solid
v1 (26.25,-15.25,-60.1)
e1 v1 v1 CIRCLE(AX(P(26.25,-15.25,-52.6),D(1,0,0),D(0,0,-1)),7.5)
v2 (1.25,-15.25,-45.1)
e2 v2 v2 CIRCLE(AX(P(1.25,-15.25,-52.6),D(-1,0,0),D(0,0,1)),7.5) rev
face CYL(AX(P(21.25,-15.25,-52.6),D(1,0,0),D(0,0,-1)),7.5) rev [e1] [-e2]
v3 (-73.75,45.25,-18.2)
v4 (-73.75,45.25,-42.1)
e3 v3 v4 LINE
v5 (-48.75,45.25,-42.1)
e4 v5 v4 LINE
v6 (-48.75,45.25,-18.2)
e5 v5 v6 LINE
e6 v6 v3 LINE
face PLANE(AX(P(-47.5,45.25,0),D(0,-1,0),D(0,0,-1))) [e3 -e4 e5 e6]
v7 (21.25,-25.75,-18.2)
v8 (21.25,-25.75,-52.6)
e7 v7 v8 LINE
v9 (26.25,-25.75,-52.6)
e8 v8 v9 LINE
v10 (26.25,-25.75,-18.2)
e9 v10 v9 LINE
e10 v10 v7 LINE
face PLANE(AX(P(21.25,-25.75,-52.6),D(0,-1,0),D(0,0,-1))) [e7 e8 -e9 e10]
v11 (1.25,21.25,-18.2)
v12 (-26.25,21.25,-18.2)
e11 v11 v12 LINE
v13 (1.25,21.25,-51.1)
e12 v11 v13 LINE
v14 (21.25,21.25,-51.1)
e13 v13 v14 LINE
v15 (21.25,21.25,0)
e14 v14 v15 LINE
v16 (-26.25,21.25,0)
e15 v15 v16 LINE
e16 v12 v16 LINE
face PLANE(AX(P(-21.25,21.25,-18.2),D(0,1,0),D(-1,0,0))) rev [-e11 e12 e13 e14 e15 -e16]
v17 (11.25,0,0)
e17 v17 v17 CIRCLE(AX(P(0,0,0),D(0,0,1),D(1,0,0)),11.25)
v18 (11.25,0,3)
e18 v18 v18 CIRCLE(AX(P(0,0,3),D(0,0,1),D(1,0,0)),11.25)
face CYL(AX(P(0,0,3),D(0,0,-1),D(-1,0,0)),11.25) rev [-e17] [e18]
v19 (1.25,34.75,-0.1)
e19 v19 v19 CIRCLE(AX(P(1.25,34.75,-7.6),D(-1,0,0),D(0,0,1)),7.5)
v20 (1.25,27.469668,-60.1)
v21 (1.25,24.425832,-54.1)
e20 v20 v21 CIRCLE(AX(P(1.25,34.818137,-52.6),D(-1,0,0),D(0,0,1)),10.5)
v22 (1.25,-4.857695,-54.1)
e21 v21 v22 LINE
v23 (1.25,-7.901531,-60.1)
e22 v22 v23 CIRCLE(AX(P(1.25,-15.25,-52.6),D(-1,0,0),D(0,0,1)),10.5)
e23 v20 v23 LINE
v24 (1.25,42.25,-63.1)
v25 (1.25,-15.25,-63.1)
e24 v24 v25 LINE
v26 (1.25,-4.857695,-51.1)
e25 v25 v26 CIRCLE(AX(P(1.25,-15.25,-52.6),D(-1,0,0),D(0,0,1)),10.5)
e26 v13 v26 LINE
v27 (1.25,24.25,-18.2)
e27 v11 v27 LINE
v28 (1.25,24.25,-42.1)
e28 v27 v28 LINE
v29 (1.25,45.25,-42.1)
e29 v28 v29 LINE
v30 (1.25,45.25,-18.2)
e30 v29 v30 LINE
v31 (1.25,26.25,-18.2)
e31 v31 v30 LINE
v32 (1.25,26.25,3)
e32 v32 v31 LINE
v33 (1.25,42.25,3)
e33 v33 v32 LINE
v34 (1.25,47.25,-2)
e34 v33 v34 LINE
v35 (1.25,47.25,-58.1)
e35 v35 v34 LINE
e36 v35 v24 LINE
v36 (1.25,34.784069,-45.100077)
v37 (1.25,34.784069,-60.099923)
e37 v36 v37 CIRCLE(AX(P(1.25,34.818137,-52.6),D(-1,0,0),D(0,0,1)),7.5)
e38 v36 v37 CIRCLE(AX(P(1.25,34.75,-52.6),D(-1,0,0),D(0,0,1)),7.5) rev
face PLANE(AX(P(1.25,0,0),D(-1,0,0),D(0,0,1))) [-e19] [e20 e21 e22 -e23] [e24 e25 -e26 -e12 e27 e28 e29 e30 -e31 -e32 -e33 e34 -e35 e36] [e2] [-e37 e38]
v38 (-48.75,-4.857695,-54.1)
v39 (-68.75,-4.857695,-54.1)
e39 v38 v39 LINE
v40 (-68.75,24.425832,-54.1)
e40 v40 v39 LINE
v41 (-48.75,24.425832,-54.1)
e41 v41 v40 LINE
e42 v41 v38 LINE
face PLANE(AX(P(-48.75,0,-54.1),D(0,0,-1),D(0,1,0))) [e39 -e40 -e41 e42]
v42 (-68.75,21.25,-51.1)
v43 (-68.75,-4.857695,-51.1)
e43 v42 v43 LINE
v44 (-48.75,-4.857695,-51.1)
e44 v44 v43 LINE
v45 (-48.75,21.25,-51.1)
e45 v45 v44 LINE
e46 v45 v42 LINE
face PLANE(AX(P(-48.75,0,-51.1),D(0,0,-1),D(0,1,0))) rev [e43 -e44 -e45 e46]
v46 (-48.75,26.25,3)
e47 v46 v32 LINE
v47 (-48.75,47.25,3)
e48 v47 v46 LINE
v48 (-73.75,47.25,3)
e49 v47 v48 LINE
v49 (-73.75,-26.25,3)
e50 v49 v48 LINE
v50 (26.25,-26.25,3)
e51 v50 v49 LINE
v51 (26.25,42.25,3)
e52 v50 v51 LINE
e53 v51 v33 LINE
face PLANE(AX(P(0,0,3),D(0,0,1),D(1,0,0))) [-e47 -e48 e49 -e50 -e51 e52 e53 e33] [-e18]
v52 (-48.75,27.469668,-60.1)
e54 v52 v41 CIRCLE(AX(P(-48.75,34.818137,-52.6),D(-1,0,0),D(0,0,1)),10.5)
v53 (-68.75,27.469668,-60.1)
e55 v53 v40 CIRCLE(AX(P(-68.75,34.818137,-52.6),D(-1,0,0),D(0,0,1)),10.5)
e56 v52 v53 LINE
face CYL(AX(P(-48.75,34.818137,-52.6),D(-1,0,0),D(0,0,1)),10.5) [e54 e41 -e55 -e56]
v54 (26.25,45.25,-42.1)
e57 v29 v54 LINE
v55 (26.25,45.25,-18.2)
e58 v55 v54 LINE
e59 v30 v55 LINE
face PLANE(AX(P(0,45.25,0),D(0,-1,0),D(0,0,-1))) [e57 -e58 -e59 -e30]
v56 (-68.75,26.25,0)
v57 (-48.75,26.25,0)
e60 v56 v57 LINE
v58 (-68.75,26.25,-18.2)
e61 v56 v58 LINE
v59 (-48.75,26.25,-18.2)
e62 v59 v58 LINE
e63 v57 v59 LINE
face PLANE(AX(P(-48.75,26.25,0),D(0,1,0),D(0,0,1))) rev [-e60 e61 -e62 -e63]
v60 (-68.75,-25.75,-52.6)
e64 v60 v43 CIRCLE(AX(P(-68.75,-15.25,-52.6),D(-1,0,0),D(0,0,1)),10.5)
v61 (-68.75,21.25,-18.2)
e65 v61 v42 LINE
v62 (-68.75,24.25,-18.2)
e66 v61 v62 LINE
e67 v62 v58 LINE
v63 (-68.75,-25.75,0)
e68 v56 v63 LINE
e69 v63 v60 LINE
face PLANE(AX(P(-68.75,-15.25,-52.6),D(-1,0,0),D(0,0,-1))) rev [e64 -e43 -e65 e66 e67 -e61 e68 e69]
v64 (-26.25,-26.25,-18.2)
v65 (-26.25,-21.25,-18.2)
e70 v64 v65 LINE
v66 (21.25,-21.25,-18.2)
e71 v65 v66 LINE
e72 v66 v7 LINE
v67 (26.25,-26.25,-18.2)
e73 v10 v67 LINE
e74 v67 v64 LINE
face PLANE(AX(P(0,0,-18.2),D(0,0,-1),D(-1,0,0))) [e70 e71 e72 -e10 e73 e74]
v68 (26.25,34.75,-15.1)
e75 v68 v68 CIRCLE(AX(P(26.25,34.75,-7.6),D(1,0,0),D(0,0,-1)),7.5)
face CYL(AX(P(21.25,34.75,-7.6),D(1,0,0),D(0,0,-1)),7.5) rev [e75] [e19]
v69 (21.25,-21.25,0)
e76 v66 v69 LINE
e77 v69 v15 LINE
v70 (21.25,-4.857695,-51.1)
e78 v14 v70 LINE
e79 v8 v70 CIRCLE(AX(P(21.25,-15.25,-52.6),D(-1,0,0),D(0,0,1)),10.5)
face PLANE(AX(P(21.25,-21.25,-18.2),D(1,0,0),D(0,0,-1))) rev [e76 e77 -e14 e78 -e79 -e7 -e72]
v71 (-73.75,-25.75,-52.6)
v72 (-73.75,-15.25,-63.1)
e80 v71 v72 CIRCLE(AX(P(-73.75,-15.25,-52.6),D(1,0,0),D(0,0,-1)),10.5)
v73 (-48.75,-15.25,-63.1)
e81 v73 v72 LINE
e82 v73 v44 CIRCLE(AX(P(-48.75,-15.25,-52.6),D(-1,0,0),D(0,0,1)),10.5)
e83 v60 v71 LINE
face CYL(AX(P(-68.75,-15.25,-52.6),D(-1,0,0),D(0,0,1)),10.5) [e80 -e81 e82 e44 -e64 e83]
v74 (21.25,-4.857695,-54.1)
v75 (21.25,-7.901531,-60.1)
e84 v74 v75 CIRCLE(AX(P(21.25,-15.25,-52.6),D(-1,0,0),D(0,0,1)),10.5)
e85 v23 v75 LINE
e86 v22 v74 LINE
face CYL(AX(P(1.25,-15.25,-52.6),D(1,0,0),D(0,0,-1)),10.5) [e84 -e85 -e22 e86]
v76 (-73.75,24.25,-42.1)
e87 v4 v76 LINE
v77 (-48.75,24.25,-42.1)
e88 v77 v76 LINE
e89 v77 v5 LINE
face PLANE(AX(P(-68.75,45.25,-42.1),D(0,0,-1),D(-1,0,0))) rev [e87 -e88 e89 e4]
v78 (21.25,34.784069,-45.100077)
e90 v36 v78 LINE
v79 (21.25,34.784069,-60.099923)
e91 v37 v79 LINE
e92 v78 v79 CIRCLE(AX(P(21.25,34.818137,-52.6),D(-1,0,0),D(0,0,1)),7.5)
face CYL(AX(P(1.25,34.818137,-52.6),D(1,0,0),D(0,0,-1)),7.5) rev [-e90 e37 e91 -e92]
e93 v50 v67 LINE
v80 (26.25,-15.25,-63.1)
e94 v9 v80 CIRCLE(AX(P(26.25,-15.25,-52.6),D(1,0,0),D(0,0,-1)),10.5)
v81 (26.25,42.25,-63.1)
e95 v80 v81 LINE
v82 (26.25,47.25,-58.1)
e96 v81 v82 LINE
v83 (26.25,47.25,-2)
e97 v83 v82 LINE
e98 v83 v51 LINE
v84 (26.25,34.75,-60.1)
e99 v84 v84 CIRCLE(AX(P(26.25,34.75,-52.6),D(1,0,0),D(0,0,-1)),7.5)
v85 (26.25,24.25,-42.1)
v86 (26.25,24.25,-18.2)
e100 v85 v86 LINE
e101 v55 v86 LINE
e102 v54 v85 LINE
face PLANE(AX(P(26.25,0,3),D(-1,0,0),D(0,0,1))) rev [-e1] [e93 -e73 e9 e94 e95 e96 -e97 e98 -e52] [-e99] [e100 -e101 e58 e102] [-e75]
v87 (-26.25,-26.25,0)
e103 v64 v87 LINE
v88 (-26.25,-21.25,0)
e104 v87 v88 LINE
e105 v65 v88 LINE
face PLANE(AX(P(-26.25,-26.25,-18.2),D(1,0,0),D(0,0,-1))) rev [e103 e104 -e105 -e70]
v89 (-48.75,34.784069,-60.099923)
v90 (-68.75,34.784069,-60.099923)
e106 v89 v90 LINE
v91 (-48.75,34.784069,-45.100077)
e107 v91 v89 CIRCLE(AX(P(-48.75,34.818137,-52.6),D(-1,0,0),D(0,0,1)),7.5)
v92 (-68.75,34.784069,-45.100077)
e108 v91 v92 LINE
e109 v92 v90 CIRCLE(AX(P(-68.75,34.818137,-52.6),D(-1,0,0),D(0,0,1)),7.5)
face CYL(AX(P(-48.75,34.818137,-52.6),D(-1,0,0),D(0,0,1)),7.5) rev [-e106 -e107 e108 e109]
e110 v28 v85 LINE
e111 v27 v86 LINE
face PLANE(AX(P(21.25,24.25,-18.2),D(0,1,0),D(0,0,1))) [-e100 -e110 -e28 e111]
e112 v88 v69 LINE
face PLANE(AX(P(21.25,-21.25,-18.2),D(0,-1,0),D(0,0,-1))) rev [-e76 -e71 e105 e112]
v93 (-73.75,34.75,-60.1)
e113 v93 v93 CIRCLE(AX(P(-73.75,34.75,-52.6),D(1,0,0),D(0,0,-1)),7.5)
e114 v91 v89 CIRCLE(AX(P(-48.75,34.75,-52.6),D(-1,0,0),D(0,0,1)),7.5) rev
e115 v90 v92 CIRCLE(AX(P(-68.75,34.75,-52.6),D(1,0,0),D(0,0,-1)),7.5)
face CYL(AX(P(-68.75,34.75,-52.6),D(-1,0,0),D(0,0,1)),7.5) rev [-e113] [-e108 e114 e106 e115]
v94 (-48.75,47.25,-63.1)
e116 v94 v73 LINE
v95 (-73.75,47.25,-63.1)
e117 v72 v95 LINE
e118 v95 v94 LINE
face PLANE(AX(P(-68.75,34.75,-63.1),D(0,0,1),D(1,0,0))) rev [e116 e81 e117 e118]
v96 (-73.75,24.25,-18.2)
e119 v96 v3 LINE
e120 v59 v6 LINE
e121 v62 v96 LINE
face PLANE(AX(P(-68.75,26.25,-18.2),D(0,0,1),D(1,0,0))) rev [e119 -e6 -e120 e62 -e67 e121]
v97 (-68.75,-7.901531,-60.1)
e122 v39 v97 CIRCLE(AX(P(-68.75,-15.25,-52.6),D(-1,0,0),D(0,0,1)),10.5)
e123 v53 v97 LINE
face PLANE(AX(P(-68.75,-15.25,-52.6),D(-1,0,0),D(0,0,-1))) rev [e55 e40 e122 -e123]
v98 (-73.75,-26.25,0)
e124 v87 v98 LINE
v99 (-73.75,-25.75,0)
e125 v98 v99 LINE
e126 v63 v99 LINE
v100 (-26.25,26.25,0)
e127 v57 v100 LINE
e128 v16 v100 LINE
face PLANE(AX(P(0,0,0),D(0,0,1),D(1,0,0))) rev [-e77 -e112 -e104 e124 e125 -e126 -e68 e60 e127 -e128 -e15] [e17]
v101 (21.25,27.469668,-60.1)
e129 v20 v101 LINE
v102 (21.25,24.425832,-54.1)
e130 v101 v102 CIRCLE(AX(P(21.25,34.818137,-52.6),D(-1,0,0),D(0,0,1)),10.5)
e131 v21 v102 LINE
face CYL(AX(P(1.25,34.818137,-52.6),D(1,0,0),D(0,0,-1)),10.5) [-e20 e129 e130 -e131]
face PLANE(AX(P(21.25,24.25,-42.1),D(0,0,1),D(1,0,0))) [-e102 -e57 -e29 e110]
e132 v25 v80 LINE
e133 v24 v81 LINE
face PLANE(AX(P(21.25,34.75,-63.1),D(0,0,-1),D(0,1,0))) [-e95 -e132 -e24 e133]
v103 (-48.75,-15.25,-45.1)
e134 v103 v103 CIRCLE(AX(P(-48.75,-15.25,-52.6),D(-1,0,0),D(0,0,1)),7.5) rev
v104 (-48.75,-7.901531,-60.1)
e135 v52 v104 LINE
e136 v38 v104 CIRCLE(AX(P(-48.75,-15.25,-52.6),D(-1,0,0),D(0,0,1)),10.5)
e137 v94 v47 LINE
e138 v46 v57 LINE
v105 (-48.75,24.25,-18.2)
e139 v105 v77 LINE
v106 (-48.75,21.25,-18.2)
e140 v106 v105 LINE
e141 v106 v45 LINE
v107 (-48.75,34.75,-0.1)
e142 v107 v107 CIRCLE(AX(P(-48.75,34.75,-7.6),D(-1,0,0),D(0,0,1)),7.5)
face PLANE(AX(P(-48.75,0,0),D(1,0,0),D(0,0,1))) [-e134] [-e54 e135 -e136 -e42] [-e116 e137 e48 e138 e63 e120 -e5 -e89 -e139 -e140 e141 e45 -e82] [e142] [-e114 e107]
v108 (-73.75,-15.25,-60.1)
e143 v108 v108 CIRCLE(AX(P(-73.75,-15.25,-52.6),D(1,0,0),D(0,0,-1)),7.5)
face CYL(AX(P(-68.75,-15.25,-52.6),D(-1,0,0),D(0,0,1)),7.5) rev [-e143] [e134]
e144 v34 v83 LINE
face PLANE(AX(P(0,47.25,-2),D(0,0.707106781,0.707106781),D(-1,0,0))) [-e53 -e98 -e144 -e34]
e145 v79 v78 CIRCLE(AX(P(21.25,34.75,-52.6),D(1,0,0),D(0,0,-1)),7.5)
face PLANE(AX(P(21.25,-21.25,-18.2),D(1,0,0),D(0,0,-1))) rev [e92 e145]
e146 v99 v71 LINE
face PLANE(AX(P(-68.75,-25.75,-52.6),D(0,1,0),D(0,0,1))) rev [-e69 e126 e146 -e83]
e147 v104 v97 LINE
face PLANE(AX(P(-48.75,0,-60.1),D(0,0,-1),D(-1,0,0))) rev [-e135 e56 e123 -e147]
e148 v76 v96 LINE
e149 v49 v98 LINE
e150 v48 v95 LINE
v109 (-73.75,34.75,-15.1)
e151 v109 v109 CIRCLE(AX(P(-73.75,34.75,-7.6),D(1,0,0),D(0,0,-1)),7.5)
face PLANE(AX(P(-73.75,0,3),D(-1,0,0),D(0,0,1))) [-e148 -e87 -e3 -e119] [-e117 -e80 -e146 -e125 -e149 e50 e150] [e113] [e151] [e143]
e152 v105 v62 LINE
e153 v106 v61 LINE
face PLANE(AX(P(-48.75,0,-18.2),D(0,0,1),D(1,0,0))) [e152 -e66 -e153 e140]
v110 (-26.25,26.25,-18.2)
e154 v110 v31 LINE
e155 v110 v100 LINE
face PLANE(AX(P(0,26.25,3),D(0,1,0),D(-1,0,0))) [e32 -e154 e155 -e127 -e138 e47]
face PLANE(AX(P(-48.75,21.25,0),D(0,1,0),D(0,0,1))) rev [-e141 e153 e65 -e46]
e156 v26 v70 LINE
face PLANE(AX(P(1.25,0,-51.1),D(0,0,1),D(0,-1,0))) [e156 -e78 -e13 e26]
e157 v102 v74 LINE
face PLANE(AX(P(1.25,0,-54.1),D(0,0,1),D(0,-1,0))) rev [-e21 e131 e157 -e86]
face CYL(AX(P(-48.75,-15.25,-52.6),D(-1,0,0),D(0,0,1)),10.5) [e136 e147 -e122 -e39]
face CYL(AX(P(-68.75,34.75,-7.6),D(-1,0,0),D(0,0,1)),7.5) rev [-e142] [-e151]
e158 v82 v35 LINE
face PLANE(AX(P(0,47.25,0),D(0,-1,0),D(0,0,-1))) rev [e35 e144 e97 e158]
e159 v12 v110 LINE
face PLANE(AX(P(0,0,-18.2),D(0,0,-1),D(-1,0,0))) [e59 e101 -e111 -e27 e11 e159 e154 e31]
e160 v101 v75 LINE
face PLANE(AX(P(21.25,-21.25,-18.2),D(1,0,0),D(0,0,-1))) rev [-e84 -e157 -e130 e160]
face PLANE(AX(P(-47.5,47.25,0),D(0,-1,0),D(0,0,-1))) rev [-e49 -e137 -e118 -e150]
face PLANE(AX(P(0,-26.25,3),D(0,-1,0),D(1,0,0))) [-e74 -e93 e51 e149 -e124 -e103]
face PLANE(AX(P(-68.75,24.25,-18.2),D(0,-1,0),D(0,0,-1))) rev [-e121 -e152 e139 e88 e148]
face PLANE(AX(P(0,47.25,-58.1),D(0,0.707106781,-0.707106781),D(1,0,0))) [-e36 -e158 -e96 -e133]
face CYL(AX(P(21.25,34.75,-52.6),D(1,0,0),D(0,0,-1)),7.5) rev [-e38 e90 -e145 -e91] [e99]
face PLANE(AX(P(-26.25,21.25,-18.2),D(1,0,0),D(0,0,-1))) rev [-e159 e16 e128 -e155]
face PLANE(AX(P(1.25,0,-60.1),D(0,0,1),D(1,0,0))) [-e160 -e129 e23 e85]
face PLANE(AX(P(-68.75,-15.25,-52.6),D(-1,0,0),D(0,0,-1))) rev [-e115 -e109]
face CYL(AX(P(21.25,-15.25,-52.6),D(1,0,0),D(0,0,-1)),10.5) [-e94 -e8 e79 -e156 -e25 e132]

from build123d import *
from build123d.topology import SkipClean

# Parameters (mm, degrees)
SKETCH1_W               = 42.5
SKETCH1_H               = 42.5
SKETCH1_R               = 11.25
BOSS_EXTRUDE1_DEPTH     = 3
BOSS_EXTRUDE2_DEPTH     = 18.2
SKETCH3_R               = 7.499999999999999
BOSS_EXTRUDE3_DEPTH     = 5
BOSS_EXTRUDE4_OUTLINE_W = 21.2
BOSS_EXTRUDE4_OUTLINE_H = 18.999999999999996
BOSS_EXTRUDE4_OUTLINE_R = 7.5
BOSS_EXTRUDE4_DEPTH     = 20
BOSS_EXTRUDE5_DEPTH     = 2
CHAMFER2_SIZE           = 5


# Read off the part's stored shape, not the designer's step: Boss-Extrude4
with BuildPart() as part:
    # Sketch1 → Boss-Extrude1 (new body)
    # profile 1 of 2: a face of its own
    with BuildSketch(Plane.XY):
        Polygon((-73.75000000000001, 26.250000000000004), (-26.250000000000018, 26.249999999999996), (26.249999999999986, 26.249999999999996), (26.249999999999986, -26.249999999999993), (-26.250000000000018, -26.249999999999993), (-73.75000000000001, -26.250000000000007), align=None)
        Rectangle(SKETCH1_W, SKETCH1_H, mode=Mode.SUBTRACT)
    # profile 2 of 2: a face of its own
    with BuildSketch(Plane.XY):
        Rectangle(SKETCH1_W, SKETCH1_H)
        Circle(SKETCH1_R, mode=Mode.SUBTRACT)
    extrude(amount=BOSS_EXTRUDE1_DEPTH)

    # Sketch2 → Boss-Extrude2 (add)
    with BuildSketch(Plane(origin=(0, 0, 0), x_dir=(-1, 0, 0), z_dir=(0, 0, -1))):
        Polygon((21.249999999999996, 21.25), (26.249999999999957, 21.249999999999996), (26.249999999999957, 26.249999999999996), (-26.249999999999986, 26.249999999999996), (-26.249999999999986, -26.250000000000018), (26.249999999999957, -26.250000000000018), (26.249999999999957, -21.25), (21.249999999999996, -21.25), (-21.250000000000004, -21.25), (-21.250000000000004, 21.25), align=None)
    extrude(amount=BOSS_EXTRUDE2_DEPTH)

    # Sketch3 → Boss-Extrude3 (add)
    with BuildSketch(Plane(origin=(26.249999999999986, 0, 0), x_dir=(0, 0, -1), z_dir=(1, 0, 0))):
        with BuildLine():
            Line((-3, 26.249999999999996), (-2.9999999999999973, 34.349999999999994))
            Line((-2.9999999999999973, 34.349999999999994), (-3, 45.24999999999999))
            Line((-3, 45.24999999999999), (18.2, 45.24999999999999))
            Line((18.2, 45.24999999999999), (18.2, 34.74999999999999))
            Line((18.2, 34.74999999999999), (18.2, 26.249999999999996))
            Line((18.2, 26.249999999999996), (18.2, 24.249999999999993))
            Line((18.2, 24.249999999999993), (42.1, 24.249999999999993))
            Line((42.1, 24.249999999999993), (42.1, 26.249999999999996))
            Line((42.1, 26.249999999999996), (42.1, 34.74999999999999))
            Line((42.1, 34.74999999999999), (42.1, 45.25))
            Line((42.1, 45.25), (63.1, 45.25000000000001))
            Line((63.1, 45.25000000000001), (63.100000000000016, 34.75))
            Line((63.100000000000016, 34.75), (63.100000000000016, -15.250000000000005))
            ThreePointArc((63.100000000000016, -15.250000000000005), (60.02462120245875, -22.67462120245876), (52.6, -25.75000000000001))
            Line((52.6, -25.75000000000001), (-2.9999999999999933, -25.750000000000014))
            Line((-2.9999999999999933, -25.750000000000014), (-3, 26.249999999999996))
        make_face()
        with Locations((7.599999999999999, 34.74999999999999)):
            Circle(SKETCH3_R, mode=Mode.SUBTRACT)
        with Locations((52.599999999999994, 34.74999999999999)):
            Circle(SKETCH3_R, mode=Mode.SUBTRACT)
        with Locations((52.6, -15.250000000000007)):
            Circle(SKETCH3_R, mode=Mode.SUBTRACT)
    boss_extrude3 = extrude(amount=-BOSS_EXTRUDE3_DEPTH)

    # Boss-Extrude4 outline → Boss-Extrude4 (add)
    # profile 1 of 2: a face of its own
    with SkipClean():  # the faces are left unmerged after this step: merging them gives an invalid solid
        with BuildSketch(Plane.ZY.offset(-21.250000000000004)):
            with Locations((-7.6, 35.75)):
                Rectangle(BOSS_EXTRUDE4_OUTLINE_W, BOSS_EXTRUDE4_OUTLINE_H)
            with Locations((-7.6, 34.75)):
                Circle(BOSS_EXTRUDE4_OUTLINE_R, mode=Mode.SUBTRACT)
        # profile 2 of 2: a face of its own
        with BuildSketch(Plane.ZY.offset(-21.250000000000004)):
            with BuildLine():
                Line((-18.2, 21.25), (-18.2, 24.25))
                Line((-18.2, 24.25), (-42.1, 24.25))
                Line((-42.1, 24.25), (-42.1, 45.25))
                Line((-42.1, 45.25), (-63.1, 45.25))
                Line((-63.1, 45.25), (-63.1, -15.25))
                ThreePointArc((-63.1, -15.25), (-45.726136458, -23.187253933), (-51.1, -4.857695155))
                Line((-51.1, -4.857695155), (-51.1, 21.25))
                Line((-51.1, 21.25), (-18.2, 21.25))
            make_face()
            with Locations((-52.6, -15.25)):
                Circle(BOSS_EXTRUDE4_OUTLINE_R, mode=Mode.SUBTRACT)
            with BuildLine():
                ThreePointArc((-54.1, -4.857695155), (-57.350393017, -5.886038969), (-60.1, -7.901530772))
                Line((-60.1, -7.901530772), (-60.1, 27.469667785))
                ThreePointArc((-60.1, 27.469667785), (-57.350393017, 25.454175983), (-54.1, 24.425832168))
                Line((-54.1, 24.425832168), (-54.1, -4.857695155))
            make_face(mode=Mode.SUBTRACT)
            with BuildLine():
                ThreePointArc((-45.100077378, 34.784068507), (-52.6, 27.25), (-60.099922622, 34.784068507))
                ThreePointArc((-60.099922622, 34.784068507), (-52.6, 42.318137014), (-45.100077378, 34.784068507))
            make_face(mode=Mode.SUBTRACT)
        boss_extrude4 = extrude(amount=BOSS_EXTRUDE4_DEPTH)

    # Sketch5 → Boss-Extrude5 (add)
    with SkipClean():  # the faces are left unmerged after this step: merging them gives an invalid solid
        with BuildSketch(Plane(origin=(0, 45.249999999999986, 1.495e-14), x_dir=(1, 0, 0), z_dir=(0, 1, 3.3e-16))):
            Polygon((26.249999999999986, 63.100000000000016), (1.2499999999999964, 63.100000000000016), (1.2500000000000047, -2.9999999999999853), (26.249999999999986, -2.9999999999999853), align=None)
        boss_extrude5 = extrude(amount=BOSS_EXTRUDE5_DEPTH)

    # Chamfer2
    # the kernel refuses this chamfer: 5 mm, written as the material it takes off along each edge
    with BuildSketch(Plane(origin=(39.10841493982953, 47.25000000000001, -63.1), x_dir=(0, -0.9996219169112968, -0.027495876610586317), z_dir=(-1, 0, 0))) as chamfer2_piece_1:
        Polygon((CHAMFER2_SIZE * 0.999621916911, CHAMFER2_SIZE * 0.0274958766106), (-CHAMFER2_SIZE * 0.0274958766106, CHAMFER2_SIZE * 0.999621916911), (0, 0), align=None)
    extrude(amount=50.71682987965909, mode=Mode.SUBTRACT)
    with BuildSketch(Plane(origin=(-11.60841493982955, 47.24999999999998, 3.000000000000001), x_dir=(0, -0.9996219169112968, 0.02749587661058606), z_dir=(1, 0, 0))) as chamfer2_piece_2:
        Polygon((CHAMFER2_SIZE * 0.999621916911, CHAMFER2_SIZE * 0.0274958766106), (-CHAMFER2_SIZE * 0.0274958766106, CHAMFER2_SIZE * 0.999621916911), (0, 0), align=None)
    extrude(amount=50.716829879659095, mode=Mode.SUBTRACT)

    # Mirror1: Boss-Extrude3, Boss-Extrude4, Boss-Extrude5 across plane
    add(boss_extrude3.mirror(Plane.ZY.offset(23.750000000000014)))
    add(boss_extrude4.mirror(Plane.ZY.offset(23.750000000000014)))
    add(boss_extrude5.mirror(Plane.ZY.offset(23.750000000000014)))


solid = part.part
